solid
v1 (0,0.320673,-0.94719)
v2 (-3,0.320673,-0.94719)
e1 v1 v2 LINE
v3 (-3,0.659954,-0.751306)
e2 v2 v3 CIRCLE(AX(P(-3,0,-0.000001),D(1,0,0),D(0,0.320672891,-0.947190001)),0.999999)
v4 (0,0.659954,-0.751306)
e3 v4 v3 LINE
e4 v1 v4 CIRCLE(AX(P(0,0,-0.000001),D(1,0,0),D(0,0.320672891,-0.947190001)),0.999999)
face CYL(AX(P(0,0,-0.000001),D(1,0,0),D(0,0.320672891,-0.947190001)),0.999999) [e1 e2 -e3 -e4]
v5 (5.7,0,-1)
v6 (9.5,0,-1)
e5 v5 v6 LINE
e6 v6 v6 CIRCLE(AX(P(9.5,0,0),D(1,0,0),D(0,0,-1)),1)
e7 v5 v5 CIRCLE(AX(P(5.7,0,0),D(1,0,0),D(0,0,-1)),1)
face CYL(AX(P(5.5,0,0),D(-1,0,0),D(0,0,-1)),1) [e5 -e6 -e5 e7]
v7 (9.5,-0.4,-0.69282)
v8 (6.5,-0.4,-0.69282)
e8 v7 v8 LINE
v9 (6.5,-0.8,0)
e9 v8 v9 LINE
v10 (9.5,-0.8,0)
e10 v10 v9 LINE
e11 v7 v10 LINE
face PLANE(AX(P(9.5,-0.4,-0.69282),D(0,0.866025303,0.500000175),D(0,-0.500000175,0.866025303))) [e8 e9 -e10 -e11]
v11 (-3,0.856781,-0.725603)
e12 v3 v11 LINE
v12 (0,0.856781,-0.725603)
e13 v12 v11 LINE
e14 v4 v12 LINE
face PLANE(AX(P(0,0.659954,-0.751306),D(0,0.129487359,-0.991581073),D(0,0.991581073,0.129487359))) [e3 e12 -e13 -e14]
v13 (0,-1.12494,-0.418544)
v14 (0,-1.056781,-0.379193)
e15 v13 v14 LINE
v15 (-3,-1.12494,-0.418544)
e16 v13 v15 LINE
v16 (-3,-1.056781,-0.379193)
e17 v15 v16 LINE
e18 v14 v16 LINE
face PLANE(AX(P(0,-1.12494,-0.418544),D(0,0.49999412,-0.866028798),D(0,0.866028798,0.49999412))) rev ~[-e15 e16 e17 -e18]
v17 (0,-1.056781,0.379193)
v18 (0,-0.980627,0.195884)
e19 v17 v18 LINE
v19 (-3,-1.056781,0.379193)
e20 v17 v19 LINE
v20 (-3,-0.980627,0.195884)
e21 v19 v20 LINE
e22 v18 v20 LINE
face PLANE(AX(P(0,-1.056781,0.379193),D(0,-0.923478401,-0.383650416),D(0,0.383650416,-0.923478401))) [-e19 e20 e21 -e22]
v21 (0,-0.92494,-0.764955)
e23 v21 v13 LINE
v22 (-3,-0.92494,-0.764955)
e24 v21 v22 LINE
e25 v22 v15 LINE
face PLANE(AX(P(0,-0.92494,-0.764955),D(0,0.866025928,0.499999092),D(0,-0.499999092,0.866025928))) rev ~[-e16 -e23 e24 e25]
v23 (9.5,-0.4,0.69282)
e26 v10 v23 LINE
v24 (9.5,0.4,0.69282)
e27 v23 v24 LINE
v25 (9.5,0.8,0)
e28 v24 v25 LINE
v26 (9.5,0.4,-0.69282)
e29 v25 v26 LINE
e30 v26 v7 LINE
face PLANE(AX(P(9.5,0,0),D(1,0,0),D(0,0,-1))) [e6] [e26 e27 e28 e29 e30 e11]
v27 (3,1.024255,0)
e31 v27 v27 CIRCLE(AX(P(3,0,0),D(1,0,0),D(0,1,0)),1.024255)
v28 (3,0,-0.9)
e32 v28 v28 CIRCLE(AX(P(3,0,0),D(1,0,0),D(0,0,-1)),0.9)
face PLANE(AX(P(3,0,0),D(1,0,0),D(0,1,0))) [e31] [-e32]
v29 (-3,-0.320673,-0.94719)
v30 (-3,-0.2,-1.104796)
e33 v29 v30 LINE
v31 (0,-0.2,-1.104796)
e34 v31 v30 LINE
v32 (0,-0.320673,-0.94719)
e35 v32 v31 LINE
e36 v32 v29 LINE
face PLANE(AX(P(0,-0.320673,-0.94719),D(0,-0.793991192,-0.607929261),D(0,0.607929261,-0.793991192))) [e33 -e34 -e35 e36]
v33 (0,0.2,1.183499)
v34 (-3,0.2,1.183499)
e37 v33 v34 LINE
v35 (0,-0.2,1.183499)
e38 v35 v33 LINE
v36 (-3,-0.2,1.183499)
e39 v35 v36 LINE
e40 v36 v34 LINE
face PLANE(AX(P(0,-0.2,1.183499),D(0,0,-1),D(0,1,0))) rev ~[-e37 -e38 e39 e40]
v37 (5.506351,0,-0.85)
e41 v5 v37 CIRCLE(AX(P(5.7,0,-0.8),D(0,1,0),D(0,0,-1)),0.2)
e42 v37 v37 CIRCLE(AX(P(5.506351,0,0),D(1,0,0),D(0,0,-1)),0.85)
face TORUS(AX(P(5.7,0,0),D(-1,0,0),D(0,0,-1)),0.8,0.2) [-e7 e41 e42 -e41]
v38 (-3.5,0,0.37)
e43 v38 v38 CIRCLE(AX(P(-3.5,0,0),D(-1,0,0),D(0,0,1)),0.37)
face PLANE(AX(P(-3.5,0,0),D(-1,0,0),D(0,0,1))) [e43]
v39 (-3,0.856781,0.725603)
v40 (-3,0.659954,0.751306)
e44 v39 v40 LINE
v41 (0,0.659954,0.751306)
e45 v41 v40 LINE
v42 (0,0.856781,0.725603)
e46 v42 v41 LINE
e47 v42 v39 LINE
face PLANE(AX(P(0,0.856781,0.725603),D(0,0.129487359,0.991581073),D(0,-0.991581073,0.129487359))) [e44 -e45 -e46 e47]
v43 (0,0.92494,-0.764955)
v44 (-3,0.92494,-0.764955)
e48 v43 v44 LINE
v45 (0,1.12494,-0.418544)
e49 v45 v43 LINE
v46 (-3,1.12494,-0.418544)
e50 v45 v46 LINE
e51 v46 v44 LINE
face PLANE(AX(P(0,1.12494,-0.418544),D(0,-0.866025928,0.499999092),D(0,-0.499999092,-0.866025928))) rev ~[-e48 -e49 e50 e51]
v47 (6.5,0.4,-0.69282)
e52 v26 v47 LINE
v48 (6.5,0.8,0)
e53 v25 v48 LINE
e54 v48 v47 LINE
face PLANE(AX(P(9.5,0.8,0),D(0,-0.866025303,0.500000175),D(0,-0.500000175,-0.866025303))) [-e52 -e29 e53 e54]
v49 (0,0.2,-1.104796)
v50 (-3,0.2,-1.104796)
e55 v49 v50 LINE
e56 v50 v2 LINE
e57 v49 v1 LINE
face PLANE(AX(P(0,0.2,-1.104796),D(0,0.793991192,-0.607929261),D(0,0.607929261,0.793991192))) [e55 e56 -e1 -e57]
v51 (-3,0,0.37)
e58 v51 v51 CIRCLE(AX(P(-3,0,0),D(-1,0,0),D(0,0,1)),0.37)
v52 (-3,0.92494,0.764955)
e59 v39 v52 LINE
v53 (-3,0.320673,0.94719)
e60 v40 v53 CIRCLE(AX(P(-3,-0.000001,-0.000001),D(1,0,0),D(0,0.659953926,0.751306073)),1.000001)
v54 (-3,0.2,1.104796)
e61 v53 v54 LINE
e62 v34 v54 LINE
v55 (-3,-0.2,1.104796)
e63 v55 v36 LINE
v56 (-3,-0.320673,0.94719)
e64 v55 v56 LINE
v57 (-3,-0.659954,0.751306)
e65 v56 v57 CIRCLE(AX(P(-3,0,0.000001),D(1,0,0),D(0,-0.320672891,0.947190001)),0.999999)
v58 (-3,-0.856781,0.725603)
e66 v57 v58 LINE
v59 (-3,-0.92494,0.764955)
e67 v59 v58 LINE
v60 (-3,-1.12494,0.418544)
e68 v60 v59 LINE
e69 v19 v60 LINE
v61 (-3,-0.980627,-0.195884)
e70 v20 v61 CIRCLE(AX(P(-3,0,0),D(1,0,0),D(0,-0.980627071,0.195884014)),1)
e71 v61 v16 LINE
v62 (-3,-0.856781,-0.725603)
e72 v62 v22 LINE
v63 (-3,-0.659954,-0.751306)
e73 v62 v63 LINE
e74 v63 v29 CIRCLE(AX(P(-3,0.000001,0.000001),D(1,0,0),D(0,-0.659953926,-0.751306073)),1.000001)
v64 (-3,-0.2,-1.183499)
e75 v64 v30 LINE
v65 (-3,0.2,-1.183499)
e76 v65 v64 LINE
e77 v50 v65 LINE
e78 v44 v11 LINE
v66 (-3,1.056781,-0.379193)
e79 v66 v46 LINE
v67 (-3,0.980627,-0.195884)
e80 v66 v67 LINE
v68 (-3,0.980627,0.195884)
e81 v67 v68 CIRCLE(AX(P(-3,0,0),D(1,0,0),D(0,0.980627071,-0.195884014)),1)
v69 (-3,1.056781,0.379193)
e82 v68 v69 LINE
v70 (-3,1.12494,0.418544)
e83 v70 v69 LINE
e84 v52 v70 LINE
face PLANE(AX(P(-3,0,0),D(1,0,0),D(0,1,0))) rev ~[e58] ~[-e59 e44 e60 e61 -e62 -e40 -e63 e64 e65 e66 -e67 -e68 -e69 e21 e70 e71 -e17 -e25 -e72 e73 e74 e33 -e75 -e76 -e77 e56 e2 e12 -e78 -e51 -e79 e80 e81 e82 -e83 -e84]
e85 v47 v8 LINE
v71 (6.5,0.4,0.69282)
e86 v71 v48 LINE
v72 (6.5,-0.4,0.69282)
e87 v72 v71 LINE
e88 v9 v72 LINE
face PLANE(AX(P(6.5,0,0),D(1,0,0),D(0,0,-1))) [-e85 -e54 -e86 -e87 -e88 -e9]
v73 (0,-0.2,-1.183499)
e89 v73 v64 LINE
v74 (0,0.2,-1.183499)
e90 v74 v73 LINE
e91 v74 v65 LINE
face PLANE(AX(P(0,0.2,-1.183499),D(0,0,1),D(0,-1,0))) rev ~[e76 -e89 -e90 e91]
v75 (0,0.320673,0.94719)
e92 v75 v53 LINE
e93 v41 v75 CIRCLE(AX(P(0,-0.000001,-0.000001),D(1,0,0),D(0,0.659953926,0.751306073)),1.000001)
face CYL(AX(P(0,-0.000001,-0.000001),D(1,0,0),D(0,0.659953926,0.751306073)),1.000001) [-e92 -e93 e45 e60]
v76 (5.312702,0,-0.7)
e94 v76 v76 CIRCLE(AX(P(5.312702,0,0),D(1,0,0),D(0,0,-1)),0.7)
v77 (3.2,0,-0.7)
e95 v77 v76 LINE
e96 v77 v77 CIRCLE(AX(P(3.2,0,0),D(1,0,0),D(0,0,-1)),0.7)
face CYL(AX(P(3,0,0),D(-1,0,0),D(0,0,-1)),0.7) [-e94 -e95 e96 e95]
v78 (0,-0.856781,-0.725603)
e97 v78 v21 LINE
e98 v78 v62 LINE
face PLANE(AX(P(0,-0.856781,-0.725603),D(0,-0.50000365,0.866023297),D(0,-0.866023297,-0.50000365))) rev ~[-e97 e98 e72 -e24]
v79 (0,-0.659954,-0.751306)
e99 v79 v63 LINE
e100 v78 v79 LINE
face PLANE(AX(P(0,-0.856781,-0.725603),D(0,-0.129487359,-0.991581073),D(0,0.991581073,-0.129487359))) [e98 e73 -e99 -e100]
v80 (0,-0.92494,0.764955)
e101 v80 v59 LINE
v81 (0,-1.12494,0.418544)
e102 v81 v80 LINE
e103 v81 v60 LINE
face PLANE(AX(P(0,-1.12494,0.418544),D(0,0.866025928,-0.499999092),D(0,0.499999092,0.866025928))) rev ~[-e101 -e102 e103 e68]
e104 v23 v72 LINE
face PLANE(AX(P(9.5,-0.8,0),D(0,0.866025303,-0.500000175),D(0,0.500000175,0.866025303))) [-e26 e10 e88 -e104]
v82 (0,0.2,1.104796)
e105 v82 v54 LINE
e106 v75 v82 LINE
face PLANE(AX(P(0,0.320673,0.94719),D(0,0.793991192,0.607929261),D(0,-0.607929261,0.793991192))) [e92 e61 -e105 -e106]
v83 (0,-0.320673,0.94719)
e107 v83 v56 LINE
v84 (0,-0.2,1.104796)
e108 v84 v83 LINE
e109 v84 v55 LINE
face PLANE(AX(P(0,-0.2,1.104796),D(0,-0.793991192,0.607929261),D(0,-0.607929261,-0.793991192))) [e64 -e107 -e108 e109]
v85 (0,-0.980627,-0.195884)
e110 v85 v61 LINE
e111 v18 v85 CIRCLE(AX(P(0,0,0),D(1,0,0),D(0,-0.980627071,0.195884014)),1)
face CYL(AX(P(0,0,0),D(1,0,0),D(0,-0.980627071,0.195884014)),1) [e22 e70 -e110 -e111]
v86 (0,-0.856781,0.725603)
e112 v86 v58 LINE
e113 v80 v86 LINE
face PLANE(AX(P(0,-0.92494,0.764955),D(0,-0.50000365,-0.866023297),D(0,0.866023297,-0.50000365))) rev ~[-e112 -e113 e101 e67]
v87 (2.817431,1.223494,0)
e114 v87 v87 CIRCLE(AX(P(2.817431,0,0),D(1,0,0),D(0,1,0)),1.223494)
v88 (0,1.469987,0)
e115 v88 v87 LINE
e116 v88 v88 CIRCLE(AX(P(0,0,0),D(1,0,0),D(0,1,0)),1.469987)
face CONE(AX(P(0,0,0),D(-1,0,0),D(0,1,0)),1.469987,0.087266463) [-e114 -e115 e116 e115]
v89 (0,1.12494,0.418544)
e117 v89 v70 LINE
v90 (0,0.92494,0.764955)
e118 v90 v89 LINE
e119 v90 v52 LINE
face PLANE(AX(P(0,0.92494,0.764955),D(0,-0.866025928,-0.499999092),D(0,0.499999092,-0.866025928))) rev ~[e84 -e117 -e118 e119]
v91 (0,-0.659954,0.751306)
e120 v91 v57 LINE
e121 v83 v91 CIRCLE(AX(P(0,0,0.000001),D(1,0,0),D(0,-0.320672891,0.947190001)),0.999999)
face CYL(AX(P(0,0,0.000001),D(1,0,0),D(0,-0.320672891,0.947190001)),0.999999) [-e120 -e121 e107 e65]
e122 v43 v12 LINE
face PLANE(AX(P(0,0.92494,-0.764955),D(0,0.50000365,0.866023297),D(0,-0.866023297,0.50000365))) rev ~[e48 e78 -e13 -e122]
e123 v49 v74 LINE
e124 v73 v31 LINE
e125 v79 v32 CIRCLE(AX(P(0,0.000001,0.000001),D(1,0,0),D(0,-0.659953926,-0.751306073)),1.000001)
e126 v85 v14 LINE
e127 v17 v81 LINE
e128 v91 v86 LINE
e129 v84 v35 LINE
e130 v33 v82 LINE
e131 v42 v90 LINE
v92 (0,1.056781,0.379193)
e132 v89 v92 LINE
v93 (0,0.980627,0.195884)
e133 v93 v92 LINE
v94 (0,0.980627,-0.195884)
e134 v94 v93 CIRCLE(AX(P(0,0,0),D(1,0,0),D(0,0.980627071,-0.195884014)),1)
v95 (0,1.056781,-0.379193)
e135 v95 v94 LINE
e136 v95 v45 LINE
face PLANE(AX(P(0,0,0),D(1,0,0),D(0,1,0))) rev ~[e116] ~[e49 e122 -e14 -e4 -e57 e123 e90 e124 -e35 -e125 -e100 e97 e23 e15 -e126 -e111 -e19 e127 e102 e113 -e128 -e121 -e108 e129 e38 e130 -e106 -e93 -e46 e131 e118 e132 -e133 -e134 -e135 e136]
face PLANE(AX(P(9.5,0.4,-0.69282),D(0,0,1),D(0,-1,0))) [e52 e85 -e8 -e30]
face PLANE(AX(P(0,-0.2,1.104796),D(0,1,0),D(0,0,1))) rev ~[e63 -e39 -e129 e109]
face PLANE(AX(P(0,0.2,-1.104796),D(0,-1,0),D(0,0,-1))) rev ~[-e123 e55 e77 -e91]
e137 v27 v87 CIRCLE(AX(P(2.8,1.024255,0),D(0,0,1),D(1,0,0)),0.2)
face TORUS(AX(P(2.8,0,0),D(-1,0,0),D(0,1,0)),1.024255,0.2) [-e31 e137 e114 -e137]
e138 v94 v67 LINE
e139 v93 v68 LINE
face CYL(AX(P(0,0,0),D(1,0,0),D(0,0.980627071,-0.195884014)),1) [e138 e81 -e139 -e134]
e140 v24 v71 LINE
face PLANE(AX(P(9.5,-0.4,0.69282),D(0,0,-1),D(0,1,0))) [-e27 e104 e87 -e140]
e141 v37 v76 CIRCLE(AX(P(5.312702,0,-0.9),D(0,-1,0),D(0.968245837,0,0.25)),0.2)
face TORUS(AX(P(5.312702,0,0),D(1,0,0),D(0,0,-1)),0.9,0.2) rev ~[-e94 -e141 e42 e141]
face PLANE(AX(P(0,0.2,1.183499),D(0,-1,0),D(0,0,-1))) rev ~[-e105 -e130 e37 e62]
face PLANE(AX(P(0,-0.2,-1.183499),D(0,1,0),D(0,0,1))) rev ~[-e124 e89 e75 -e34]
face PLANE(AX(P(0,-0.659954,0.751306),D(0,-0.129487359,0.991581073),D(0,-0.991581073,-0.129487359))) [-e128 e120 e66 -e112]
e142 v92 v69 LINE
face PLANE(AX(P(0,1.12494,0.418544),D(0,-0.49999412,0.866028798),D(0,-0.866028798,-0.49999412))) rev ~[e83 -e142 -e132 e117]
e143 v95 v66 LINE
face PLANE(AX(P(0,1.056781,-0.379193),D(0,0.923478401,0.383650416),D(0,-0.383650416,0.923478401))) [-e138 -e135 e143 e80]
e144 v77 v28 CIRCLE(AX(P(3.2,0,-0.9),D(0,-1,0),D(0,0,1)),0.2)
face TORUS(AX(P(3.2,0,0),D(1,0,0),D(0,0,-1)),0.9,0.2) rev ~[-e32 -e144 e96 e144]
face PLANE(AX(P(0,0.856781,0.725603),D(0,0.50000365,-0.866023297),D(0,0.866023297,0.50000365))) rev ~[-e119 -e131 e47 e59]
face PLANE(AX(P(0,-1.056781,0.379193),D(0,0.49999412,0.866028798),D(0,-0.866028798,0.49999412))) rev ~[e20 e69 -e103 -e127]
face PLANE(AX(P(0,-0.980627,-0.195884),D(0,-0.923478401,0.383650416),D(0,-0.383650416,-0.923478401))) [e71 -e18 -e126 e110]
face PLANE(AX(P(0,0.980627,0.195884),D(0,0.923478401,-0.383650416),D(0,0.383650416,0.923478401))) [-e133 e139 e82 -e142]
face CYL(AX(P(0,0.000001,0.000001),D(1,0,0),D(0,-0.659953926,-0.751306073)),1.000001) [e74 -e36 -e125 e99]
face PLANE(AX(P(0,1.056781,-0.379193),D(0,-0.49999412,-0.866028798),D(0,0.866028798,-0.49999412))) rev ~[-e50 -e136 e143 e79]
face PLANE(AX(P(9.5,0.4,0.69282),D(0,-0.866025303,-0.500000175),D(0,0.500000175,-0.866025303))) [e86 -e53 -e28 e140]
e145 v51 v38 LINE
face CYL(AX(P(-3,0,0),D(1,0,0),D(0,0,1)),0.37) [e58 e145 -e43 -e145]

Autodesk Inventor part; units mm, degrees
ref_plane "YZ Plane" through (0, 0, 0) normal (1, 0, 0) x (0, 1, 0)
ref_plane "XZ Plane" through (0, 0, 0) normal (0, 1, 0) x (-1, 0, 0)
ref_plane "XY Plane" through (0, 0, 0) normal (0, 0, 1) x (1, 0, 0)
sketch "Sketch1" plane through (0, 0, 0) normal (1, 0, 0) x (0, 1, 0)
  line L0 (1.056781, -0.379193) -> (0.980627, -0.195884)
  line L1 (1.056781, -0.379193) -> (1.12494, -0.418544)
  line L2 (1.12494, -0.418544) -> (0.92494, -0.764955)
  line L3 (0.92494, -0.764955) -> (0.856781, -0.725603)
  line L4 (0.659954, -0.751306) -> (0.856781, -0.725603)
  arc A0 (0.320673, -0.94719) -> (0.659954, -0.751306) centre (0, 0) ccw
  line L5 (0.2, -1.104796) -> (0.320673, -0.94719)
  line L6 (0.2, -1.104796) -> (0.2, -1.183499)
  line L7 (0.2, -1.183499) -> (-0.2, -1.183499)
  line L8 (-0.2, -1.183499) -> (-0.2, -1.104796)
  line L9 (-0.320673, -0.94719) -> (-0.2, -1.104796)
  arc A1 (-0.659954, -0.751306) -> (-0.320673, -0.94719) centre (0, 0) ccw
  line L10 (-0.856781, -0.725603) -> (-0.659954, -0.751306)
  line L11 (-0.856781, -0.725603) -> (-0.92494, -0.764955)
  line L12 (-0.92494, -0.764955) -> (-1.12494, -0.418544)
  line L13 (-1.12494, -0.418544) -> (-1.056781, -0.379193)
  line L14 (-0.980627, -0.195884) -> (-1.056781, -0.379193)
  arc A2 (-0.980627, 0.195884) -> (-0.980627, -0.195884) centre (0, 0) ccw
  line L15 (-1.056781, 0.379193) -> (-0.980627, 0.195884)
  line L16 (-1.056781, 0.379193) -> (-1.12494, 0.418544)
  line L17 (-1.12494, 0.418544) -> (-0.92494, 0.764955)
  line L18 (-0.92494, 0.764955) -> (-0.856781, 0.725603)
  line L19 (-0.659954, 0.751306) -> (-0.856781, 0.725603)
  arc A3 (-0.320673, 0.94719) -> (-0.659954, 0.751306) centre (0, 0) ccw
  line L20 (-0.2, 1.104796) -> (-0.320673, 0.94719)
  line L21 (-0.2, 1.104796) -> (-0.2, 1.183499)
  line L22 (-0.2, 1.183499) -> (0.2, 1.183499)
  line L23 (0.2, 1.183499) -> (0.2, 1.104796)
  line L24 (0.320673, 0.94719) -> (0.2, 1.104796)
  arc A4 (0.659954, 0.751306) -> (0.320673, 0.94719) centre (0, 0) ccw
  line L25 (0.856781, 0.725603) -> (0.659954, 0.751306)
  line L26 (0.856781, 0.725603) -> (0.92494, 0.764955)
  line L27 (0.92494, 0.764955) -> (1.12494, 0.418544)
  line L28 (1.12494, 0.418544) -> (1.056781, 0.379193)
  line L29 (0.980627, 0.195884) -> (1.056781, 0.379193)
  arc A5 (0.980627, -0.195884) -> (0.980627, 0.195884) centre (0, 0) ccw
  circle A6 centre (0, 0) radius 1.469987
  point P0 (0, 0)
extrude "Extrusion1" add sketch "Sketch1" against normal blind 3 contours L1 L2 L3 L4 A0 L5 L6 L7 L8 L9 A1 L10 L11 L12 L13 L14 A2 L15 L16 L17 L18 L19 A3 L20 L21 L22 L23 L24 A4 L25 L26 L27 L28 L29 A5 L0
sketch "Sketch1 outline for Extrusion2" plane through (0, 0, 0) normal (1, 0, 0) x (0, 1, 0)
  circle A0 centre (0, 0) radius 1.469987
extrude "Extrusion2" add sketch "Sketch1 outline for Extrusion2" along normal blind 3 draft -5
sketch "Sketch2" plane through (3, 0, 0) normal (1, 0, 0) x (0, 0, -1)
  circle A0 centre (0, 0) radius 0.7
  dimension "d6" = 1.4
extrude "Extrusion3" add sketch "Sketch2" along normal blind 2.5
sketch "Sketch3" plane through (5.5, 0, 0) normal (1, 0, 0) x (0, 0, -1)
  circle A0 centre (0, 0) radius 1
  dimension "d7" = 2
extrude "Extrusion4" add sketch "Sketch3" along normal blind 4
sketch "Sketch4" plane through (9.5, 0, 0) normal (1, 0, 0) x (0, 0, -1)
  circle A0 centre (0, 0) radius 0.8
  line L0 (0, -0.8) -> (-0.69282, -0.4)
  line L1 (-0.69282, -0.4) -> (-0.69282, 0.4)
  line L2 (-0.69282, 0.4) -> (0, 0.8)
  line L3 (0, 0.8) -> (0.69282, 0.4)
  line L4 (0.69282, 0.4) -> (0.69282, -0.4)
  line L5 (0.69282, -0.4) -> (0, -0.8)
  dimension "d10" = 1.6
extrude "Extrusion5" cut sketch "Sketch4" against normal blind 3 contours L4 L5 L0 L1 L2 L3
fillet "Fillet1" radius 0.2 4 edges at (5.5, 0, 1) (3, -1.2075, 0) (3, 0, 0.7) (5.5, 0, 0.7)
sketch "Sketch5" plane through (-3, 0, 0) normal (-1, 0, 0) x (0, 0, 1)
  circle A0 centre (0, 0) radius 0.37
  dimension "d14" = 0.74
extrude "Extrusion6" add sketch "Sketch5" along normal blind 0.5
thread "Thread1" size "M0.8x0.2" class "6g" standard "ANSI Metric M Profile" full length
properties part number "lagnut_screw" material "Steel"
